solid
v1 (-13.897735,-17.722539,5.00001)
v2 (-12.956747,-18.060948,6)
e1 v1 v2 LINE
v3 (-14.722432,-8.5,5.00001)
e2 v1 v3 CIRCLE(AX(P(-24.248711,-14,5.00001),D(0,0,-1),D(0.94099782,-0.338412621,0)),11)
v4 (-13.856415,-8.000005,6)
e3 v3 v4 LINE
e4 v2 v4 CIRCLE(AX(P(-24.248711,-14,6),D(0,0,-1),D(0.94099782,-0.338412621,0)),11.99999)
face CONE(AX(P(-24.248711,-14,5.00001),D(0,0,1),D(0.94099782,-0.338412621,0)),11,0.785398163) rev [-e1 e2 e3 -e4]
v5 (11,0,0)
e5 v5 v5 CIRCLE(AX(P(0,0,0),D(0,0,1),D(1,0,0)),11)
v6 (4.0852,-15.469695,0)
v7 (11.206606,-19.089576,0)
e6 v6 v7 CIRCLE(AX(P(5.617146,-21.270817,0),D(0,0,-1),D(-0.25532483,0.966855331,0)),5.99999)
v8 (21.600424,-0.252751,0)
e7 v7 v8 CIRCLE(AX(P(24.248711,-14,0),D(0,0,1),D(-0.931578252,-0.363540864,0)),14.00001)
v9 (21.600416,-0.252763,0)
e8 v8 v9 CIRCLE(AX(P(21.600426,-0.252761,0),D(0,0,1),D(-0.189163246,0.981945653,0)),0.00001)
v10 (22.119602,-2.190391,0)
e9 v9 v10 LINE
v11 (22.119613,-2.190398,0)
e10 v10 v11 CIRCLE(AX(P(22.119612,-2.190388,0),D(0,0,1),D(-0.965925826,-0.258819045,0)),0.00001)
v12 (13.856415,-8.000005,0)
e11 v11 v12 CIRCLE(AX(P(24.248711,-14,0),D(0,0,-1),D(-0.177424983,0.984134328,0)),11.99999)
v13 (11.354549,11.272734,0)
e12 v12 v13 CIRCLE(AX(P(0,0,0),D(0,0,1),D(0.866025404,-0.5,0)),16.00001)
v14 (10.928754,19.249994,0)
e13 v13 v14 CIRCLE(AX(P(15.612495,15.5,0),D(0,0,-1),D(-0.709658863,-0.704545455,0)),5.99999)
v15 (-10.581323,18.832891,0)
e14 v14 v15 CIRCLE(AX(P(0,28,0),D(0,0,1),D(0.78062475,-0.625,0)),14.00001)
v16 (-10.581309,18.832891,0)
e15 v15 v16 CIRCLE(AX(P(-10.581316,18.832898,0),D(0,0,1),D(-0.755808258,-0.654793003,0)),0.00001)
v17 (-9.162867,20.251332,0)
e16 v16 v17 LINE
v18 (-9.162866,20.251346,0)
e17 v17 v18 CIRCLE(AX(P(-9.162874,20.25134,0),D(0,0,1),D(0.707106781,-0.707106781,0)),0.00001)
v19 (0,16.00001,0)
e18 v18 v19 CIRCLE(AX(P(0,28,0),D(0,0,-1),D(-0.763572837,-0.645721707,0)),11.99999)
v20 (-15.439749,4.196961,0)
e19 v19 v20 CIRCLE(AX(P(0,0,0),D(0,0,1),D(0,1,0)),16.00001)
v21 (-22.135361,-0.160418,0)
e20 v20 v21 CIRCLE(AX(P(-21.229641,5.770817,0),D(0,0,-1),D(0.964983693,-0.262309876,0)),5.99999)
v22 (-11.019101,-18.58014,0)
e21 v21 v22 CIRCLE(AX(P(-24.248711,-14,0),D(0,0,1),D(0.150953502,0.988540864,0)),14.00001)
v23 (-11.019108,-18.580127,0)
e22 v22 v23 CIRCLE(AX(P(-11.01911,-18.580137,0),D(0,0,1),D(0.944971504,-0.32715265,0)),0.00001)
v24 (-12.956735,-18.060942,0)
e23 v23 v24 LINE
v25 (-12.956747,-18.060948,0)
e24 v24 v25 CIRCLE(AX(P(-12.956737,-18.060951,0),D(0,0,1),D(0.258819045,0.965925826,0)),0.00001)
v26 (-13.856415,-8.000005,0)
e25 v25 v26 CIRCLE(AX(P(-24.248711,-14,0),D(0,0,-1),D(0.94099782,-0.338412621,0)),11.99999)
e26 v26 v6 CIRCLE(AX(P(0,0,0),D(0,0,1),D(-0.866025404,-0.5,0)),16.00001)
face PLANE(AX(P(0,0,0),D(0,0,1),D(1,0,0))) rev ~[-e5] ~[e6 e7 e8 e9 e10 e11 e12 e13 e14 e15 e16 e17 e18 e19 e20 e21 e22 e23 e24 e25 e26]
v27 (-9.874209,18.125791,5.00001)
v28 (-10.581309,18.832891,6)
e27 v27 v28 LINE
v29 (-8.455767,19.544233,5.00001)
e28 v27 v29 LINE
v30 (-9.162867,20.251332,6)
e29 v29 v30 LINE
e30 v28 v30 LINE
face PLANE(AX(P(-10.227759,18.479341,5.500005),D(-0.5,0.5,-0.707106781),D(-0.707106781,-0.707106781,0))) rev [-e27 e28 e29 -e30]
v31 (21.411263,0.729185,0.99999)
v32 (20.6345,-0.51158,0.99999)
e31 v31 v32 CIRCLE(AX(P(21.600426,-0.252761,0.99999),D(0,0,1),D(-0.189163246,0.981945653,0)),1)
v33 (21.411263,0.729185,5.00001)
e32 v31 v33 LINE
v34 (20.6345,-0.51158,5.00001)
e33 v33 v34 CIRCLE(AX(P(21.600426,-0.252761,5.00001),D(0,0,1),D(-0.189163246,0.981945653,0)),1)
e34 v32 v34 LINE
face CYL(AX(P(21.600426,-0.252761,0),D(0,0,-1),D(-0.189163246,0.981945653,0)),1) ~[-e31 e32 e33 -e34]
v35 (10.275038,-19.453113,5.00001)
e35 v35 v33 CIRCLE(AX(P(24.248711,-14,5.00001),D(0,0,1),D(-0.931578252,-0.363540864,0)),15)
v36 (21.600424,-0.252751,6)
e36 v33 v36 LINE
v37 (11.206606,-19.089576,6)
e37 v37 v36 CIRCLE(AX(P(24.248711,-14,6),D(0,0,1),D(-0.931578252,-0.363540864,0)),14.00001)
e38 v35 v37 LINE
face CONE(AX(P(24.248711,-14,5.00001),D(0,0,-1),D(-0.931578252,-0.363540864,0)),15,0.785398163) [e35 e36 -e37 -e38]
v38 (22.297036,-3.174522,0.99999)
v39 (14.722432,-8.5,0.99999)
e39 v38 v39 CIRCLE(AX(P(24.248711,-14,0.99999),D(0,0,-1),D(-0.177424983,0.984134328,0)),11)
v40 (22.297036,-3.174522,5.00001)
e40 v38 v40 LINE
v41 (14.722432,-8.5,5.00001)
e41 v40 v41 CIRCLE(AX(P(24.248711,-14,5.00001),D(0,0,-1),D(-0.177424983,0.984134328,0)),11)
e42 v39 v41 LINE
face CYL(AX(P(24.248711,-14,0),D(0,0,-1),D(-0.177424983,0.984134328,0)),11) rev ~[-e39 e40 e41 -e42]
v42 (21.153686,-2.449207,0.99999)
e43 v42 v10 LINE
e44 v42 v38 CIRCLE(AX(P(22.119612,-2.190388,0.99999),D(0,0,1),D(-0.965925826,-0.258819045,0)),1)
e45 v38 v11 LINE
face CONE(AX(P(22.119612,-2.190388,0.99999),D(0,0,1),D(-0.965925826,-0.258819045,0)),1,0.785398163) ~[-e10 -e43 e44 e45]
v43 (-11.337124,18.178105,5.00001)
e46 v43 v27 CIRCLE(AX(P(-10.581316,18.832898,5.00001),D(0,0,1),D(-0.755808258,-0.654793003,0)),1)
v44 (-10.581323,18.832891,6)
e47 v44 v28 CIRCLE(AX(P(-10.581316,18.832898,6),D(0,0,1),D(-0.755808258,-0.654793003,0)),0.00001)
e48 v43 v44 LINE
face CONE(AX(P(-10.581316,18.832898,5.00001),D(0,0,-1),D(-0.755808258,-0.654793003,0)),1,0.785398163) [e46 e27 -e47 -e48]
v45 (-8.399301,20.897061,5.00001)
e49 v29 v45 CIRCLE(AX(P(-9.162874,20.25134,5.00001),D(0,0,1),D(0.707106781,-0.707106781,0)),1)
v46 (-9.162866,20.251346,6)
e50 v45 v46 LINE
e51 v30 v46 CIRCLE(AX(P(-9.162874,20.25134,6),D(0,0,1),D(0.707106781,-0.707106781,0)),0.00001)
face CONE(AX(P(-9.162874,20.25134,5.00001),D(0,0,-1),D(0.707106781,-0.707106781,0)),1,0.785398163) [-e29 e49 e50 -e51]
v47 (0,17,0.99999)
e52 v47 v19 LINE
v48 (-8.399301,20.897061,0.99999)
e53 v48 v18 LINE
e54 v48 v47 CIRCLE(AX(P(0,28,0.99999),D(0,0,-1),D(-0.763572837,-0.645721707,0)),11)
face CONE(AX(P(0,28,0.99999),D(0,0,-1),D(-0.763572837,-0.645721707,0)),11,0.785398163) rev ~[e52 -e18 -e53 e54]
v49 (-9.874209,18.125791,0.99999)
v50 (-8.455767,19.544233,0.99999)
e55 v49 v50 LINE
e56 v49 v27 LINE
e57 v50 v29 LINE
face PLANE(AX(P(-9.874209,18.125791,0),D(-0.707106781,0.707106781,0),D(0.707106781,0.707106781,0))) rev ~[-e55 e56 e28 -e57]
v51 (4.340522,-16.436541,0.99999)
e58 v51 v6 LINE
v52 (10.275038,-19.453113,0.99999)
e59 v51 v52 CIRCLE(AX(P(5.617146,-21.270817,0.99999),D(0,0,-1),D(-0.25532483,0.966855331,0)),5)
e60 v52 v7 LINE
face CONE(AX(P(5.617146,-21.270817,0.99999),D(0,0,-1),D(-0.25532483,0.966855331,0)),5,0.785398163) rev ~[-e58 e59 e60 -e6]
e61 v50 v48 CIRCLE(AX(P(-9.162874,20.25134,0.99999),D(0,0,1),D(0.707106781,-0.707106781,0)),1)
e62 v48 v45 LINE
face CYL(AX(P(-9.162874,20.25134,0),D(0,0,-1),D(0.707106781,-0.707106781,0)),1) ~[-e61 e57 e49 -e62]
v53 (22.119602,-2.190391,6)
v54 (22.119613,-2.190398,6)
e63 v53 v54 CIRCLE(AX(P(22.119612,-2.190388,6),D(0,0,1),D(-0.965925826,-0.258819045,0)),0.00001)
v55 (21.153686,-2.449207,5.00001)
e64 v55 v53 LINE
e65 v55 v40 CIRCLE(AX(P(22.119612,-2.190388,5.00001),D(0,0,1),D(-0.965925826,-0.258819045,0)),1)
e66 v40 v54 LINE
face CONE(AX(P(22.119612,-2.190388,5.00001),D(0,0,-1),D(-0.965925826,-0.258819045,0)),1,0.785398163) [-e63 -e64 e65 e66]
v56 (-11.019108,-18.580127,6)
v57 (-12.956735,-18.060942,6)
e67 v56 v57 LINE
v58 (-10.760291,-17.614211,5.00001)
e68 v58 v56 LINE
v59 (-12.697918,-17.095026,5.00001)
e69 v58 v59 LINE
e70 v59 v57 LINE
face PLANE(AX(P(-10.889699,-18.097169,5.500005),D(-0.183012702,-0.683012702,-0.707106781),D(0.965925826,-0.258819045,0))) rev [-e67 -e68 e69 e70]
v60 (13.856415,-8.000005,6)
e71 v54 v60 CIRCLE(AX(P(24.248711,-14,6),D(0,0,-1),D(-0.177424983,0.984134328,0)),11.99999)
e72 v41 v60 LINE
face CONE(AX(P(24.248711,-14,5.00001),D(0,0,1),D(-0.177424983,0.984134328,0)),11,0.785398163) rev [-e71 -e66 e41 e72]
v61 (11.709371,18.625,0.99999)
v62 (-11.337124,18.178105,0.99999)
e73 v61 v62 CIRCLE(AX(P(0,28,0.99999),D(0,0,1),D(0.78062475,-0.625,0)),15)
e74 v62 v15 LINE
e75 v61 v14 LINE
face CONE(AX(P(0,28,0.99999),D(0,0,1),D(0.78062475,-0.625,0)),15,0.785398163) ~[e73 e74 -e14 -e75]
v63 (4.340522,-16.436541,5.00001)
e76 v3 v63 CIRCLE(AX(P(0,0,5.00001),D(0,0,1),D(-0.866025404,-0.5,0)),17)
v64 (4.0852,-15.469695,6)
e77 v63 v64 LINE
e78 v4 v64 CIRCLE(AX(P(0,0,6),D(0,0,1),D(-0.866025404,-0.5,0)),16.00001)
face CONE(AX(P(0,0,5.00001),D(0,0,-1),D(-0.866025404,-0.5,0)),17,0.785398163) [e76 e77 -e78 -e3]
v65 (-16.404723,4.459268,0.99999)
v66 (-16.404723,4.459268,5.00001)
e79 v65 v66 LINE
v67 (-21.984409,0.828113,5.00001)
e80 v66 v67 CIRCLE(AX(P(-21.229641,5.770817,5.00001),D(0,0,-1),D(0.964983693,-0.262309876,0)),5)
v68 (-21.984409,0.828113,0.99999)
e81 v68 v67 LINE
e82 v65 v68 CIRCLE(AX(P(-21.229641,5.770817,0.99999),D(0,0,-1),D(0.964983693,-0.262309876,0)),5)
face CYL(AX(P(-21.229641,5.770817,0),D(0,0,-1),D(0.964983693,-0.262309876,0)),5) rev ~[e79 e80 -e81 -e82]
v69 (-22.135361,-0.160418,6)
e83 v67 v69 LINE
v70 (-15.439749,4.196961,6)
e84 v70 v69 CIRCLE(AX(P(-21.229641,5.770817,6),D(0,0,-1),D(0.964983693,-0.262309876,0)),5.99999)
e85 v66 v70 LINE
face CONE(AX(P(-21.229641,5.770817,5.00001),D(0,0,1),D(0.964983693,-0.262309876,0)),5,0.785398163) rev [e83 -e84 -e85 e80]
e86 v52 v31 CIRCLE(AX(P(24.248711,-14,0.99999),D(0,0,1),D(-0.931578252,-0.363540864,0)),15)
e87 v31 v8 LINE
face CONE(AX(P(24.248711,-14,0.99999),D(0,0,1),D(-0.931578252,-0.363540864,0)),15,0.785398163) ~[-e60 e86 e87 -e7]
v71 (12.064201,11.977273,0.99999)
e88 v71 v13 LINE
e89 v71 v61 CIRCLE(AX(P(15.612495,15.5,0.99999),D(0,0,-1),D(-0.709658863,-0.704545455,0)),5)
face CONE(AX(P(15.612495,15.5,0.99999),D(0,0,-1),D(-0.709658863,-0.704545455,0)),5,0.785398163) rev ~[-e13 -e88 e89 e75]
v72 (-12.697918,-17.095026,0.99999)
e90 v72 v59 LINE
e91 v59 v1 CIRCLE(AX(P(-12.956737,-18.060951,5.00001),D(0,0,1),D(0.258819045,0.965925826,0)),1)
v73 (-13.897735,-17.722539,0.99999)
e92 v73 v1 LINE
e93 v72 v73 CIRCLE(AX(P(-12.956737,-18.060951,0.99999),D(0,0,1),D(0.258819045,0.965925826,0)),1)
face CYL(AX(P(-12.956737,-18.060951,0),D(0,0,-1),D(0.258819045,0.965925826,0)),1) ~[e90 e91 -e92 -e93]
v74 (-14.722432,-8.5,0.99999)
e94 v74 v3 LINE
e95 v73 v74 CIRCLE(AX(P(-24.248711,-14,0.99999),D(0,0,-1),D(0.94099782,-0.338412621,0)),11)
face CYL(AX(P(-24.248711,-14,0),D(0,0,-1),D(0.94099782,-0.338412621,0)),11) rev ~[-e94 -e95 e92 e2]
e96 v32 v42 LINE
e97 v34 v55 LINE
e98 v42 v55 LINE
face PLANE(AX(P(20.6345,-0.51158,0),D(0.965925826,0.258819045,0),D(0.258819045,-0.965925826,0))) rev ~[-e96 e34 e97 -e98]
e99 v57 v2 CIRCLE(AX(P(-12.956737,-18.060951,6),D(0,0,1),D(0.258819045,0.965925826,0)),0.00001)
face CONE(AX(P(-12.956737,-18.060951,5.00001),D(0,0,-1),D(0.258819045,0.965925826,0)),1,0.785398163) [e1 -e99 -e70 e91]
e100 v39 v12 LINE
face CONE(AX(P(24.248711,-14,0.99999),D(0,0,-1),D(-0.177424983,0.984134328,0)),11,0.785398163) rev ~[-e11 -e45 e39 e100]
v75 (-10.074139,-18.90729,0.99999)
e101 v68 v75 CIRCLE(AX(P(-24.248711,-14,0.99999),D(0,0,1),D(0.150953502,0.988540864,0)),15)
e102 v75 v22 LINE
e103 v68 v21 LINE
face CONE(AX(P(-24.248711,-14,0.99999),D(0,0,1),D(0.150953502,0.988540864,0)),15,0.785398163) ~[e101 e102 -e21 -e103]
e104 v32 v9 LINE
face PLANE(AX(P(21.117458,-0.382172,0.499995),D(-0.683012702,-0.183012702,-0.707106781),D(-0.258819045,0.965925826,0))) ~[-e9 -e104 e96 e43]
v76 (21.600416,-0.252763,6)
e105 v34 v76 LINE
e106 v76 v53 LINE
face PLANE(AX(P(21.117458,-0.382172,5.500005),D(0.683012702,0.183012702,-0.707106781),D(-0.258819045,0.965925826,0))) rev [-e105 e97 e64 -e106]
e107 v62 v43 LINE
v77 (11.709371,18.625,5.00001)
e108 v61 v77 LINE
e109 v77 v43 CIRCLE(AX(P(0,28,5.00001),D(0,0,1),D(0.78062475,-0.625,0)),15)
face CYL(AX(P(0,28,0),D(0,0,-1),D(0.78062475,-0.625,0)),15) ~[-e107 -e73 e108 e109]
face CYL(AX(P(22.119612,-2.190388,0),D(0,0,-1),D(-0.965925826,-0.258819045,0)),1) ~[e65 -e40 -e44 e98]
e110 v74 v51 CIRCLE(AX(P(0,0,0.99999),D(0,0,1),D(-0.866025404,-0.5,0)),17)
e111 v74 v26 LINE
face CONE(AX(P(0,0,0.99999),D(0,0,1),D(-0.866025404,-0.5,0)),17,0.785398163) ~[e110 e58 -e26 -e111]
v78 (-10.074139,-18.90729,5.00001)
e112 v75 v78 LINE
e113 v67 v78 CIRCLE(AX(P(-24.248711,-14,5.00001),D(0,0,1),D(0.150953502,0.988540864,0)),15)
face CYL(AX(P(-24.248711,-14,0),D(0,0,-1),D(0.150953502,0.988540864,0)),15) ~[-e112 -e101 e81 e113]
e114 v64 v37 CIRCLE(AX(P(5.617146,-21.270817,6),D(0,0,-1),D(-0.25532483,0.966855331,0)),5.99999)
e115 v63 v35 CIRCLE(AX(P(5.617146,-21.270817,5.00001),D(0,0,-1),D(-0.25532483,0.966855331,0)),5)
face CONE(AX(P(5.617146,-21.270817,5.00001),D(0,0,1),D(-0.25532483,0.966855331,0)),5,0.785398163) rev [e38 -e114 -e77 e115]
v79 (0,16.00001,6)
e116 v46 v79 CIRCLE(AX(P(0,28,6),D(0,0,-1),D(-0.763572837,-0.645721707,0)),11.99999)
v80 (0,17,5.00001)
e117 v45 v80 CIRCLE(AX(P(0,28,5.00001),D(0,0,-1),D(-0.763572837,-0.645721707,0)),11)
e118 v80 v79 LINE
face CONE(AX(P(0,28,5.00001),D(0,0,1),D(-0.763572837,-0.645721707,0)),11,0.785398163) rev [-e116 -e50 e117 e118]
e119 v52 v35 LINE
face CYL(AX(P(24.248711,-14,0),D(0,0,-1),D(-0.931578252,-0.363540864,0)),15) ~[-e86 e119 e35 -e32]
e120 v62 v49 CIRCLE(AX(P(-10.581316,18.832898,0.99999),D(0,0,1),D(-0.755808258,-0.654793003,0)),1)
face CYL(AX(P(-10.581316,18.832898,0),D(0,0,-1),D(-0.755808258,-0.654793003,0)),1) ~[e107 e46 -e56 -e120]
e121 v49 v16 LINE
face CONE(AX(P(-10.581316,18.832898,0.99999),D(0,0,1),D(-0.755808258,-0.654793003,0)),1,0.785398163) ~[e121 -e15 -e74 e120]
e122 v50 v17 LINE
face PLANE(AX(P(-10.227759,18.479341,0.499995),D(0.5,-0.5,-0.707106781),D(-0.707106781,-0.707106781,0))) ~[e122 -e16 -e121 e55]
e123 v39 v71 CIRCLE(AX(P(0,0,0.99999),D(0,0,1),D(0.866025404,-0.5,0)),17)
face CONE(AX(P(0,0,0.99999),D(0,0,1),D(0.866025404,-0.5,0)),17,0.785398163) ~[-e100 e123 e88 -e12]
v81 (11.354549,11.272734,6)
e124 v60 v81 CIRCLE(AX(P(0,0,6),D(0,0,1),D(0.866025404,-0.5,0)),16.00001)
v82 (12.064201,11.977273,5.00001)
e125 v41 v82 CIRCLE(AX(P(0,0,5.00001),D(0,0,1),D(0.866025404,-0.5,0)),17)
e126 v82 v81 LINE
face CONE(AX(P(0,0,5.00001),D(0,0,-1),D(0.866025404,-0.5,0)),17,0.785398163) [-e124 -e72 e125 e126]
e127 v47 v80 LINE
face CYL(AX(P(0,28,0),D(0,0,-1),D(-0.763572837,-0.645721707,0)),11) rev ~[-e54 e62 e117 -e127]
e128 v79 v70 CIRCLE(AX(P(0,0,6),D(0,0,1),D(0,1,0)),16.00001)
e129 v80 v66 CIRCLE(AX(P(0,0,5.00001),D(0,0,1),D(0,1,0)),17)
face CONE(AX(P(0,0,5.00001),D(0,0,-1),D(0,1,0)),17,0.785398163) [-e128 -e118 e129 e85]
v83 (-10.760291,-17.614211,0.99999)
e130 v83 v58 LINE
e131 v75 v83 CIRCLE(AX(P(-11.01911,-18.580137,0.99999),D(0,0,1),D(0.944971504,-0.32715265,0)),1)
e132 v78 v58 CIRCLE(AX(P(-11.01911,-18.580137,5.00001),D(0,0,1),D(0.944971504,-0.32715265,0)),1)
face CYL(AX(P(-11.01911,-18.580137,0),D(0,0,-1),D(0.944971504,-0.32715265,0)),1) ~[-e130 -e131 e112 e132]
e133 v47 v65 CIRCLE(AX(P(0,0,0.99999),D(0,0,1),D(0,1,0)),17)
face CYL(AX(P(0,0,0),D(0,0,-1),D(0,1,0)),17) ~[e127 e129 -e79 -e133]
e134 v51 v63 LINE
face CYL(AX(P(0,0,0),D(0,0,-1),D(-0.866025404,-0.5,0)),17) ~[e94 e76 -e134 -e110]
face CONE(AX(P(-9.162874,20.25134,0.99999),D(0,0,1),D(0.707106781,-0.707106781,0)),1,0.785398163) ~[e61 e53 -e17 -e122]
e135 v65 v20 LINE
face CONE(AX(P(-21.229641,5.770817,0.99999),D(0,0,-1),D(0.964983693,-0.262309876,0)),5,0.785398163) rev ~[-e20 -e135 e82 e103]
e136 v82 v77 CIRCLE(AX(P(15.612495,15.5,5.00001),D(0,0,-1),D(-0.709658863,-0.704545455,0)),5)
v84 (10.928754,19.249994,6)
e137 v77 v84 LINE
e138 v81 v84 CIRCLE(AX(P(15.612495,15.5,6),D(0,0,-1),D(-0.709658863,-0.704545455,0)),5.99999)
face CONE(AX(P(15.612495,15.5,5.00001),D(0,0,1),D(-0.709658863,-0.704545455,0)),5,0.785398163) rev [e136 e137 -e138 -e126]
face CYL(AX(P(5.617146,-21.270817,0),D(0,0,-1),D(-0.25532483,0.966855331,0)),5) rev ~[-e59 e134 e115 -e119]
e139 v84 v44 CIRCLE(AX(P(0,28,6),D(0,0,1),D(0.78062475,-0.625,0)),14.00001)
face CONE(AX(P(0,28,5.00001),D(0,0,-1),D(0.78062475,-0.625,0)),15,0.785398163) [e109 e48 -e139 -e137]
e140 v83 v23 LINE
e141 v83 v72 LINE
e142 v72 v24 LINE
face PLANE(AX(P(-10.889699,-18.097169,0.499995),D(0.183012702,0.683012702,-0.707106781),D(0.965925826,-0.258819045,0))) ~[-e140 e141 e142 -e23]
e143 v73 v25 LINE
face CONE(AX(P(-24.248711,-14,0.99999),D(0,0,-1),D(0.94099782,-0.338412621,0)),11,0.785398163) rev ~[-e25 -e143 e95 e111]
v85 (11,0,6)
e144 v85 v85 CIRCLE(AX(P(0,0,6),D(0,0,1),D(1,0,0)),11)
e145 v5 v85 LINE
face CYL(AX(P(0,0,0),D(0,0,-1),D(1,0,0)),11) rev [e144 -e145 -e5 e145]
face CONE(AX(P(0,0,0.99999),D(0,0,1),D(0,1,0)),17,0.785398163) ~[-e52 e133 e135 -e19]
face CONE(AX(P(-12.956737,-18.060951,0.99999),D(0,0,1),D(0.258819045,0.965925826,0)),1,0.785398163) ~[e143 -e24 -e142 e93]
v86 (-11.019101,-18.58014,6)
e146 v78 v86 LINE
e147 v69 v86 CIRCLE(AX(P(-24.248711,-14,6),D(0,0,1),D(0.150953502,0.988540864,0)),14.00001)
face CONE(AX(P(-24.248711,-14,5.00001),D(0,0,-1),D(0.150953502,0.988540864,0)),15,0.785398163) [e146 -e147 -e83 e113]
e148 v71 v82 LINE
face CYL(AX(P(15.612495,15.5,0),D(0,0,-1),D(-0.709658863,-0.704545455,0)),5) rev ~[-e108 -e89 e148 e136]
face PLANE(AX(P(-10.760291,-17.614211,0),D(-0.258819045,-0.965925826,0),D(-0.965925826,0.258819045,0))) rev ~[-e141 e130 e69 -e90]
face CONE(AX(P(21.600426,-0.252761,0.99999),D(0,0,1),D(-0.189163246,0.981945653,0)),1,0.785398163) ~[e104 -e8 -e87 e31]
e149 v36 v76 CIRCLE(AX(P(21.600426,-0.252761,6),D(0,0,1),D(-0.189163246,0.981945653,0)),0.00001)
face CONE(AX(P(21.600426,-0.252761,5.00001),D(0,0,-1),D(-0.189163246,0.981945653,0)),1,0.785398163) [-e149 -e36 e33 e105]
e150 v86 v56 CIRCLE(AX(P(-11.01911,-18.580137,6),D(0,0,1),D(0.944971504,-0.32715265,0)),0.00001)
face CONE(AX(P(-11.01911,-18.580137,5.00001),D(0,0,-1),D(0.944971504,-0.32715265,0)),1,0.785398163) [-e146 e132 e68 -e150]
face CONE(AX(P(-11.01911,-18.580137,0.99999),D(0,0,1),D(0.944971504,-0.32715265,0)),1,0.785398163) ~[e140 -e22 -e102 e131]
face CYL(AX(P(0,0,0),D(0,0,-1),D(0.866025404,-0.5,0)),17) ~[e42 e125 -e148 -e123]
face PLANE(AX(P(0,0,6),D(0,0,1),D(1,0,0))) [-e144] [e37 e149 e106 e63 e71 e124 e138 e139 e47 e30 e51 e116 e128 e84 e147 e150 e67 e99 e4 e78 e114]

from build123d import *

# Parameters (mm, degrees)
F0_R     = 11
F1_DEPTH = 6
F2_SIZE  = 0.99999


# Not quite as in the source:
# - a fillet or chamfer is up to 0.001 mm smaller than in the source, because OpenCascade refuses the exact size


with BuildPart() as f1:
    # F0 (on Top) → F1 (new body)
    with BuildSketch(Plane.XY):
        with BuildLine():
            ThreePointArc((-8.3993012068, 20.8970612253), (4.6296691825, 37.9782845851), (0, 17))
            ThreePointArc((0, 17), (-10.3245446798, 13.5056942492), (-16.4047227892, 4.4592679005))
            ThreePointArc((-16.4047227892, 4.4592679005), (-18.5023983731, 1.580095835), (-21.984408769, 0.8281129622))
            ThreePointArc((-21.984408769, 0.8281129622), (-37.0912454672, -21.75043975), (-10.0741387442, -18.90728975))
            ThreePointArc((-10.0741387442, -18.90728975), (-10.1357694828, -18.1114057356), (-10.7602912032, -17.6142112737))
            Line((-10.7602912032, -17.6142112737), (-12.6979184167, -17.0950256266))
            ThreePointArc((-12.6979184167, -17.0950256266), (-13.420186678, -17.1748279717), (-13.8977352822, -17.7225388318))
            ThreePointArc((-13.8977352822, -17.7225388318), (-35.2049938341, -14.9797311694), (-14.7224318643, -8.5))
            ThreePointArc((-14.7224318643, -8.5), (-6.5340019757, -15.6941650999), (4.3405221105, -16.4365406278))
            ThreePointArc((4.3405221105, -16.4365406278), (7.882796053, -16.8135949396), (10.275037522, -19.4531129622))
            ThreePointArc((10.275037522, -19.4531129622), (37.3820561006, -21.2467409576), (21.4112626123, 0.7291848013))
            ThreePointArc((21.4112626123, 0.7291848013), (20.7528222067, 0.2778690088), (20.6345000323, -0.5115798972))
            Line((20.6345000323, -0.5115798972), (21.1536856793, -2.4492071107))
            ThreePointArc((21.1536856793, -2.4492071107), (21.5839306681, -3.0348086009), (22.297036489, -3.1745223935))
            ThreePointArc((22.297036489, -3.1745223935), (30.5753246516, -22.9985534157), (14.7224318643, -8.5))
            ThreePointArc((14.7224318643, -8.5), (16.8585466555, 2.1884708506), (12.0642006787, 11.9772727273))
            ThreePointArc((12.0642006787, 11.9772727273), (10.6196023201, 15.2334991046), (11.709371247, 18.625))
            ThreePointArc((11.709371247, 18.625), (-0.2908106334, 42.9971807076), (-11.3371238681, 18.1781049487))
            ThreePointArc((-11.3371238681, 18.1781049487), (-10.6170527239, 17.8335367268), (-9.8742088291, 18.1257911709))
            Line((-9.8742088291, 18.1257911709), (-8.4557672626, 19.5442327374))
            ThreePointArc((-8.4557672626, 19.5442327374), (-8.1637439901, 20.2096365726), (-8.3993012068, 20.8970612253))
        make_face()
        Circle(F0_R, mode=Mode.SUBTRACT)
    extrude(amount=F1_DEPTH)

    # F2 (size 1 in the source; OpenCascade refuses exactly that, so slightly less here)
    f2_edges = [f1.edges().sort_by_distance(p)[0] for p in [
        (-37.091245, -21.75044, 6),
        (37.382056, -21.246741, 0),
    ]]
    chamfer(f2_edges, length=F2_SIZE)


solid = f1.part
